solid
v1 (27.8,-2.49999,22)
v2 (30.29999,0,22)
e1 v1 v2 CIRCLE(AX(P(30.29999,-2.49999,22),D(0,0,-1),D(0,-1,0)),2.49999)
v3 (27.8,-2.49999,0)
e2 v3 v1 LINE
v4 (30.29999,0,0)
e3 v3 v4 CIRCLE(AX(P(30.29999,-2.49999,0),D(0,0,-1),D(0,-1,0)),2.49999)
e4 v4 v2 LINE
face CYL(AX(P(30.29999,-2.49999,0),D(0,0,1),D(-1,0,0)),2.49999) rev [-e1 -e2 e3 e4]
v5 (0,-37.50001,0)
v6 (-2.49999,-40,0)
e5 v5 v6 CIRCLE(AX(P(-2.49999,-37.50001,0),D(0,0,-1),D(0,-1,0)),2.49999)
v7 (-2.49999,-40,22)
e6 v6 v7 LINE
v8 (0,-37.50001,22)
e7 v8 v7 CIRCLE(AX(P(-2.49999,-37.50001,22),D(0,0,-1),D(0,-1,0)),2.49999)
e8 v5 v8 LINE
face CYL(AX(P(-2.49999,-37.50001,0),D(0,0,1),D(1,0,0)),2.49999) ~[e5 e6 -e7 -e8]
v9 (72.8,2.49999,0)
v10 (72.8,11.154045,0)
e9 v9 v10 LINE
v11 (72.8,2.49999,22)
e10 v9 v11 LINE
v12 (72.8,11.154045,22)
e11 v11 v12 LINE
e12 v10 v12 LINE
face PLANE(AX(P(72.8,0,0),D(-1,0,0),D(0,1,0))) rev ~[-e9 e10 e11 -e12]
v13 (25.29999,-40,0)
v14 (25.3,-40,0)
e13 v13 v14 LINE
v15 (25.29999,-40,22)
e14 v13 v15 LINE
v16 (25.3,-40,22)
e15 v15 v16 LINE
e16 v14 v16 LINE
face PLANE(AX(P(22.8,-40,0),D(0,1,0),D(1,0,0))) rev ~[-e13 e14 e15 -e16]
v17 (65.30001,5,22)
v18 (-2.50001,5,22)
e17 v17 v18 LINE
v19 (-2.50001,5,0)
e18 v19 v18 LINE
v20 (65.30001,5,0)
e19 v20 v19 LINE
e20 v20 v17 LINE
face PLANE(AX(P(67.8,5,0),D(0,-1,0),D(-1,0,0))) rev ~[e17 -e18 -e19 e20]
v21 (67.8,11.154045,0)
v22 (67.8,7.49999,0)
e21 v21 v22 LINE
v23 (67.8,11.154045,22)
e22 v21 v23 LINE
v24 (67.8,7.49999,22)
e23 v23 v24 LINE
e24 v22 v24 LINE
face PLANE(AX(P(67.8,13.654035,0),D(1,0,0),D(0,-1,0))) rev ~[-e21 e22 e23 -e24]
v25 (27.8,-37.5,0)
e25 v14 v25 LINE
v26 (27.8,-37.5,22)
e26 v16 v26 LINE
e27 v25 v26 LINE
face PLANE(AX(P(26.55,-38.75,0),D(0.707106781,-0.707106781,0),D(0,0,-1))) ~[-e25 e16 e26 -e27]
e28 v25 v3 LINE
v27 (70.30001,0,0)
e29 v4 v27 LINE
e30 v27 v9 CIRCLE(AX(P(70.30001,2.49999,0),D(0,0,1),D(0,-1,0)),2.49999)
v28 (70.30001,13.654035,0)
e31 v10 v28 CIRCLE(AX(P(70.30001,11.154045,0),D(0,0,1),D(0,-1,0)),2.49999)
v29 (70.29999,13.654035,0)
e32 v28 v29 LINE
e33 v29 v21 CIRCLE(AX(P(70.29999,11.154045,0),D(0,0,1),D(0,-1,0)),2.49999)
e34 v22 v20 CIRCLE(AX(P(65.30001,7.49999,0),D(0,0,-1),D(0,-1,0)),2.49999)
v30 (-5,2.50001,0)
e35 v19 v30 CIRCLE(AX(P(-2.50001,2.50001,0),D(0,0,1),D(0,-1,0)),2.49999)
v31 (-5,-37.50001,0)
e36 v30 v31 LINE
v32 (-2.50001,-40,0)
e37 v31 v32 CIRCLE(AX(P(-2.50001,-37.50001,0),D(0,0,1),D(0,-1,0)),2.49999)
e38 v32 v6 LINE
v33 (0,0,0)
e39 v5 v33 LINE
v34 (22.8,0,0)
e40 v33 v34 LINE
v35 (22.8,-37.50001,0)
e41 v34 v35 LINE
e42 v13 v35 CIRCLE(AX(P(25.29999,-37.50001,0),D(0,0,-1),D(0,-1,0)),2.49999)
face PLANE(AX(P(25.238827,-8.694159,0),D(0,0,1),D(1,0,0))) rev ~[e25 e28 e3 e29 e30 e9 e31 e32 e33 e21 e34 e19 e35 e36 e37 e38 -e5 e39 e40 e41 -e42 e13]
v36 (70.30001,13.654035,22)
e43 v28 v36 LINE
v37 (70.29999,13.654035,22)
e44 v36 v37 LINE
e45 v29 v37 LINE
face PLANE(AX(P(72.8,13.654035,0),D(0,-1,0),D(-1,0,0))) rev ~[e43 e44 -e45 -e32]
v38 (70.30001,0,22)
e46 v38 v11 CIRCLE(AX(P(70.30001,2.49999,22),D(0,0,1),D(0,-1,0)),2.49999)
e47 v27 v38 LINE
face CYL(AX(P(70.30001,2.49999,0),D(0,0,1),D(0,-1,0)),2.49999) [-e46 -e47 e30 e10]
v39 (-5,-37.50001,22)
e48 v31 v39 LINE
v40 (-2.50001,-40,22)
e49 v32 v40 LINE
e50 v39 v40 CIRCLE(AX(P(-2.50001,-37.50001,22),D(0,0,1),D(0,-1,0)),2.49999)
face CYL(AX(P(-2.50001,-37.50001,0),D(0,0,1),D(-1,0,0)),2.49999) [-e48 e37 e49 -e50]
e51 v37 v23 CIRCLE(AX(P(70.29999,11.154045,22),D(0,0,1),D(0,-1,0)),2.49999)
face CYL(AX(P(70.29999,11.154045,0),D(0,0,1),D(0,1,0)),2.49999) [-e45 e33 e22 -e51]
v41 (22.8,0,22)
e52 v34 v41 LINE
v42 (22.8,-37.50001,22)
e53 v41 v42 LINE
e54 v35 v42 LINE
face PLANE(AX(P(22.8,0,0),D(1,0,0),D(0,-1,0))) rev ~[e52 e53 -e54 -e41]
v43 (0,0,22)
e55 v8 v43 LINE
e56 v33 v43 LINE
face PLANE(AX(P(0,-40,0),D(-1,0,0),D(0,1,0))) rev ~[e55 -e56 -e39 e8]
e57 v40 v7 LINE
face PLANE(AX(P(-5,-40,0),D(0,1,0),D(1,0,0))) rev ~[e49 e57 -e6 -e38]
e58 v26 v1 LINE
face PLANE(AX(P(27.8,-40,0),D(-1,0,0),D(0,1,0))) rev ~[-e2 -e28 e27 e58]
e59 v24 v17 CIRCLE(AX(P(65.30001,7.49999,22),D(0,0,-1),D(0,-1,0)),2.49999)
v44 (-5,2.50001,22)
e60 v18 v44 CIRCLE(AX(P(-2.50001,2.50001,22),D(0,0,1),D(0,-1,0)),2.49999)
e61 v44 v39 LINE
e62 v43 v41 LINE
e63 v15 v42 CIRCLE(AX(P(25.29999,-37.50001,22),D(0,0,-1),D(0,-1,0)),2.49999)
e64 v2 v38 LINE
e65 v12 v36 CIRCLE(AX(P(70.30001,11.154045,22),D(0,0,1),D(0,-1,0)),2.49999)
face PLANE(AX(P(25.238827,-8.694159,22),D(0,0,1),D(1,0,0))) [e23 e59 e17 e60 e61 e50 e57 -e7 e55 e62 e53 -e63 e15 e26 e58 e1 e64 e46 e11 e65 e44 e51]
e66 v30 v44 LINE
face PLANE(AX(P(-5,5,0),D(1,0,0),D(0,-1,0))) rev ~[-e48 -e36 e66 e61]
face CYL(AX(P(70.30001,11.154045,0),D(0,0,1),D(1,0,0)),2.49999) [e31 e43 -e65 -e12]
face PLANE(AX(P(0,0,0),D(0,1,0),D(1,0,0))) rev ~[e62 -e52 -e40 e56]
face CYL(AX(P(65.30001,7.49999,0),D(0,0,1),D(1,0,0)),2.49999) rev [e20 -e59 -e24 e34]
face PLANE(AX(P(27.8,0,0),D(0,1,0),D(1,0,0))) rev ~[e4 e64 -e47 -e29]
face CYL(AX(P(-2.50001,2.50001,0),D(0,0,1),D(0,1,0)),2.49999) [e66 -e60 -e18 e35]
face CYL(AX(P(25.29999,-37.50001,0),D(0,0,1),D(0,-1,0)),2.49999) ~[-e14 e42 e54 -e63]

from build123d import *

# Parameters (mm, degrees)
F1_DEPTH = 22
F2_R     = 2.49999
F3_SIZE  = 2.5
F4_R     = 2.49999


# Not quite as in the source:
# - a fillet or chamfer is up to 0.001 mm smaller than in the source, because OpenCascade refuses the exact size


with BuildPart() as f1:
    # F0 (on Top) → F1 (new body)
    with BuildSketch(Plane.XY):
        Polygon((0, -40), (0, 0), (22.8, 0), (22.8, -40), (27.8, -40), (27.8, 0), (72.8, 0), (72.8, 13.6540349229), (67.8, 13.6540349229), (67.8, 5), (-5, 5), (-5, -40), align=None)
    extrude(amount=F1_DEPTH)

    # F2 (radius 2.5 in the source; OpenCascade refuses exactly that, so slightly less here)
    f2_edges = [f1.edges().sort_by_distance(p)[0] for p in [
        (72.8, 0, 11),
        (27.8, 0, 11),
        (67.8, 5, 11),
        (67.8, 13.654035, 11),
        (72.8, 13.654035, 11),
        (-5, 5, 11),
        (-5, -40, 11),
        (0, -40, 11),
    ]]
    fillet(f2_edges, radius=F2_R)

    # F3
    f3_edges = [f1.edges().sort_by_distance(p)[0] for p in [
        (27.8, -40, 11),
    ]]
    chamfer(f3_edges, length=F3_SIZE)

    # F4 (radius 2.5 in the source; OpenCascade refuses exactly that, so slightly less here)
    f4_edges = [f1.edges().sort_by_distance(p)[0] for p in [
        (22.8, -40, 11),
    ]]
    fillet(f4_edges, radius=F4_R)


solid = f1.part
